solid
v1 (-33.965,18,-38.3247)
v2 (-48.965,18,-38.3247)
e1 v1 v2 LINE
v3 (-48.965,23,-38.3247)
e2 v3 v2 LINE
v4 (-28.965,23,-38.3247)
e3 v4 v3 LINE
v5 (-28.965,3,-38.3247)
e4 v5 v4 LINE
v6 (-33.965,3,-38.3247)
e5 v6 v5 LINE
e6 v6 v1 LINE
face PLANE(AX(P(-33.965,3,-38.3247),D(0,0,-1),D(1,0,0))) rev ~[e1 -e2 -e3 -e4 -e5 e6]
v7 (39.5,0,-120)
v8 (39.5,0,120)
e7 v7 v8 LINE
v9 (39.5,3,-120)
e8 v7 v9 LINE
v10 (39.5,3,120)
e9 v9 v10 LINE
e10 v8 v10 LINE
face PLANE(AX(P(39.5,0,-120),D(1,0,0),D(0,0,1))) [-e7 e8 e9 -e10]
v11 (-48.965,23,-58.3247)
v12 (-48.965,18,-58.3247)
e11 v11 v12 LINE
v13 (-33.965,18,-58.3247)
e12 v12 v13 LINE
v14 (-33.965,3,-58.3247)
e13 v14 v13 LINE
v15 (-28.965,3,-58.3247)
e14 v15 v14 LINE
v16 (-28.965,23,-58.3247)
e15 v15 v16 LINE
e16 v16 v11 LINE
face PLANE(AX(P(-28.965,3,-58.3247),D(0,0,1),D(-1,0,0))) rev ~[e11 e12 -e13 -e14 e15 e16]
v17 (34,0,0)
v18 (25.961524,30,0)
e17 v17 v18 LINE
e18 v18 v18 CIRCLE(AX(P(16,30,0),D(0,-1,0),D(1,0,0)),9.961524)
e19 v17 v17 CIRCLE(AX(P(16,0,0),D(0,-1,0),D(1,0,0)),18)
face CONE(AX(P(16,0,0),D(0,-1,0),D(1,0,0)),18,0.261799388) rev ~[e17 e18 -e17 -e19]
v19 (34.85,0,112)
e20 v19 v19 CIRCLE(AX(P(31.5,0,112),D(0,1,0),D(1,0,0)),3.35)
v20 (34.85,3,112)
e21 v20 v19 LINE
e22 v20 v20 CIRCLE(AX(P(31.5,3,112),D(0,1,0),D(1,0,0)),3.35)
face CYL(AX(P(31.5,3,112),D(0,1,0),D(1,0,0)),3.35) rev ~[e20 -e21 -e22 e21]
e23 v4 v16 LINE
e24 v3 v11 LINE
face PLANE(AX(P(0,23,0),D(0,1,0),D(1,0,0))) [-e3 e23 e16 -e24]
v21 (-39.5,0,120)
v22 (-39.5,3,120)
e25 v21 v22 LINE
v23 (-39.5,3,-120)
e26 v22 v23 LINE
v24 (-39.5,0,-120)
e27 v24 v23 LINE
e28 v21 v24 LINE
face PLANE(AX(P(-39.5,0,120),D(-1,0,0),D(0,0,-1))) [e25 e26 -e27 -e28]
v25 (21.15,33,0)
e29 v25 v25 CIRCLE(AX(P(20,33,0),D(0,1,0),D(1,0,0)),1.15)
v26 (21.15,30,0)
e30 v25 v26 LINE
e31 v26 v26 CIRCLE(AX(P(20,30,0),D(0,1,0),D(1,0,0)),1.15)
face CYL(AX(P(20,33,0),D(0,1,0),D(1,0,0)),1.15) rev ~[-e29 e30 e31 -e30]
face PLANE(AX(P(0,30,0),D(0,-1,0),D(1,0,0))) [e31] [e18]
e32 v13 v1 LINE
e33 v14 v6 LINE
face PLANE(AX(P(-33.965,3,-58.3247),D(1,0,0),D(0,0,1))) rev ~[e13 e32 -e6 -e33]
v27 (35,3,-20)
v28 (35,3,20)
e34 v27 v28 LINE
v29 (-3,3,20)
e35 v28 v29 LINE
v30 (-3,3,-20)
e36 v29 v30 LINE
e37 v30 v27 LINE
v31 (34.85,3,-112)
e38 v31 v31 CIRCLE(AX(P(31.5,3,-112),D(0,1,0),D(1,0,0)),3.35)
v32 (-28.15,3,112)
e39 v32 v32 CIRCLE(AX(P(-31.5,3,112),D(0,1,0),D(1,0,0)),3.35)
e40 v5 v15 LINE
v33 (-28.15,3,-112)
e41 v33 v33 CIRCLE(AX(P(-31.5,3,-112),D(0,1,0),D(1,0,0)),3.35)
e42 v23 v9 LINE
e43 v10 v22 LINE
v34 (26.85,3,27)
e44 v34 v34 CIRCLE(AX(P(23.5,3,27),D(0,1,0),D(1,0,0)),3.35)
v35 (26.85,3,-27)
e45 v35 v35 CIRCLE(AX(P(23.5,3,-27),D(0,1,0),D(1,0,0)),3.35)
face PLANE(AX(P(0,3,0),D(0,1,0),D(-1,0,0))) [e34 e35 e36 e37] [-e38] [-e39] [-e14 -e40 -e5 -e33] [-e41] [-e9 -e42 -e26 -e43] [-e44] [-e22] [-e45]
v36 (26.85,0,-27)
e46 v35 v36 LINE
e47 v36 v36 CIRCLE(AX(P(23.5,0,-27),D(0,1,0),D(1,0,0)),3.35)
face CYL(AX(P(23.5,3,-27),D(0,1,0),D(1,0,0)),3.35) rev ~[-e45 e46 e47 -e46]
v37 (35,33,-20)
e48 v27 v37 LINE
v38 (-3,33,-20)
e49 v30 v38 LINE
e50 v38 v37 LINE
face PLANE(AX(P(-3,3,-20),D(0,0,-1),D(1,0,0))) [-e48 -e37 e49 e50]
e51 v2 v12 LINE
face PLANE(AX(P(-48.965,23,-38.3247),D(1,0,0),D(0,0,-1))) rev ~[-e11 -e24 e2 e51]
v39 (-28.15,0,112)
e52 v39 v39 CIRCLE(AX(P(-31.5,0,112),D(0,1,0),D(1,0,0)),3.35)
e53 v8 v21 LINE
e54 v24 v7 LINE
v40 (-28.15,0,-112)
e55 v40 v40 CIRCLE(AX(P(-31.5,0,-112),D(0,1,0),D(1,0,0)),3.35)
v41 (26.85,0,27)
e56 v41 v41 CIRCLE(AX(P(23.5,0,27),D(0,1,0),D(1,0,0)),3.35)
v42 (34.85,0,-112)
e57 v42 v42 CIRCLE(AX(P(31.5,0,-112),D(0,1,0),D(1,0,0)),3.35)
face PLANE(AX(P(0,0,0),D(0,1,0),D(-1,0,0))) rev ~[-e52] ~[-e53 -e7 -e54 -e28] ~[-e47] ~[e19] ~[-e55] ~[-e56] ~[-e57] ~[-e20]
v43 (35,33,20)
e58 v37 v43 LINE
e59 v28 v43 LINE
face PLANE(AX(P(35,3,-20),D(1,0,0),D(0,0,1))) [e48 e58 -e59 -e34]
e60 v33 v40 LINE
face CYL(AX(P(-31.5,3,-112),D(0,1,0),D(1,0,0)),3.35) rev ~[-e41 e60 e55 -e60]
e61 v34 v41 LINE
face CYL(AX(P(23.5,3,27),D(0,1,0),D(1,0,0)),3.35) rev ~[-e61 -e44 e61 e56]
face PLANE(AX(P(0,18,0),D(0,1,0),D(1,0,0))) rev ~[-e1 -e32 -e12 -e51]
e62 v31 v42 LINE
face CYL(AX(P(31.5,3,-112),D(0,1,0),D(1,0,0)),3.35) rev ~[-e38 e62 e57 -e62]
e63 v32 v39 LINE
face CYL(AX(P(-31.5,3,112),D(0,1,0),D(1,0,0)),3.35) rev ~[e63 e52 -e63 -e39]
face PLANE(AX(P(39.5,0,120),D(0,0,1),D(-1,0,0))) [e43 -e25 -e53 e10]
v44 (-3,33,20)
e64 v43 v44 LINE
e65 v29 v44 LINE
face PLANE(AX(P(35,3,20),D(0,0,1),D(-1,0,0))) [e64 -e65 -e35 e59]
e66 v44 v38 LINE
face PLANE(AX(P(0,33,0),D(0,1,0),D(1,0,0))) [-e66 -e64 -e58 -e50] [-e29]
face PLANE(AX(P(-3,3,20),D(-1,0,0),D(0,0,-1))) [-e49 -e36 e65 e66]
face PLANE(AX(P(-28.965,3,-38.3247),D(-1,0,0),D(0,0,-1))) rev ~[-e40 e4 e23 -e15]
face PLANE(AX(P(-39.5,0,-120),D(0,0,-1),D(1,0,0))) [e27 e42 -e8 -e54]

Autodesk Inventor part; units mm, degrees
ref_plane "YZ Plane" through (0, 0, 0) normal (1, 0, 0) x (0, 1, 0)
ref_plane "XZ Plane" through (0, 0, 0) normal (0, 1, 0) x (-1, 0, 0)
ref_plane "XY Plane" through (0, 0, 0) normal (0, 0, 1) x (1, 0, 0)
sketch "Sketch44" plane through (0, 0, 0) normal (0, 1, 0) x (-1, 0, 0)
  line L0 (-39.5, 120) -> (39.5, 120)
  line L1 (39.5, 120) -> (39.5, -120)
  line L2 (39.5, -120) -> (-39.5, -120)
  line L3 (-39.5, -120) -> (-39.5, 120)
  line L4 (-39.5, 120) -> (39.5, -120) construction
  line L5 (39.5, 120) -> (-39.5, -120) construction
  point P0 (0, 0)
  dimension "d138" = 79
  dimension "d139" = 240
extrude "Extrusion33" add sketch "Sketch44" along normal blind 3
sketch "Sketch45" plane through (0, 3, 0) normal (0, 1, 0) x (1, 0, 0)
  line L0 (35, -20) -> (-3, -20)
  line L1 (-3, -20) -> (-3, 20)
  line L2 (-3, 20) -> (35, 20)
  line L3 (35, 20) -> (35, -20)
  point P0 (0, 0)
  dimension "d142" = 38
  dimension "d143" = 40
extrude "Extrusion34" add sketch "Sketch45" along normal blind 30
sketch "Sketch47" plane through (0, 0, 0) normal (0, -1, 0) x (1, 0, 0)
  circle A0 centre (16, 0) radius 18
  point P0 (0, 0)
  dimension "d146" = 36
extrude "Extrusion35" cut sketch "Sketch47" against normal blind 30 draft -15
sketch "Sketch60" plane through (0, 3, 0) normal (0, 1, 0) x (1, 0, 0)
  line L0 (-33.965, 38.3247) -> (-28.965, 38.3247)
  line L1 (-28.965, 38.3247) -> (-28.965, 58.3247)
  line L2 (-28.965, 58.3247) -> (-33.965, 58.3247)
  line L3 (-33.965, 58.3247) -> (-33.965, 38.3247)
  point P0 (0, 0)
  dimension "d164" = 5
  dimension "d165" = 20
extrude "Extrusion40" add sketch "Sketch60" along normal blind 20
sketch "Sketch61" plane through (0, 23, 0) normal (0, 1, 0) x (1, 0, 0)
  line L0 (-28.965, 38.3247) -> (-28.965, 58.3247) projected
  line L1 (-28.965, 38.3247) -> (-48.965, 38.3247)
  line L2 (-48.965, 38.3247) -> (-48.965, 58.3247)
  line L3 (-48.965, 58.3247) -> (-28.965, 58.3247)
  line L4 (-28.965, 58.3247) -> (-28.965, 38.3247)
  point P0 (0, 0)
  dimension "d168" = 20
  dimension "d169" = 20
extrude "Extrusion41" add sketch "Sketch61" against normal blind 5
sketch "Sketch68" plane through (0, 3, 0) normal (0, 1, 0) x (1, 0, 0)
  circle A0 centre (-31.5, -112) radius 3.35
  circle A1 centre (31.5, -112) radius 3.35
  circle A2 centre (-31.5, 112) radius 3.35
  circle A3 centre (31.5, 112) radius 3.35
  point P0 (0, 0)
  dimension "d192" = 6.7
  dimension "d193" = 6.7
  dimension "d194" = 6.7
  dimension "d195" = 6.7
extrude "Extrusion46" cut sketch "Sketch68" against normal through all
sketch "Sketch69" plane through (0, 3, 0) normal (0, 1, 0) x (1, 0, 0)
  circle A0 centre (23.5, -27) radius 3.35
  circle A1 centre (23.5, 27) radius 3.35
  point P0 (0, 0)
  dimension "d198" = 6.7
  dimension "d199" = 6.7
extrude "Extrusion47" cut sketch "Sketch69" against normal through all
sketch "Sketch74" plane through (0, 33, 0) normal (0, 1, 0) x (1, 0, 0)
  circle A0 centre (20, 0) radius 1.15
  point P0 (0, 0)
  dimension "d210" = 2.3
extrude "Extrusion51" cut sketch "Sketch74" against normal blind 10
equation "\"d193\" = d192"
equation "\"d194\" = d192"
equation "\"d195\" = d192"
equation "\"d198\" = d192"
equation "\"d199\" = d192"
properties part number "liquid port_v12"
